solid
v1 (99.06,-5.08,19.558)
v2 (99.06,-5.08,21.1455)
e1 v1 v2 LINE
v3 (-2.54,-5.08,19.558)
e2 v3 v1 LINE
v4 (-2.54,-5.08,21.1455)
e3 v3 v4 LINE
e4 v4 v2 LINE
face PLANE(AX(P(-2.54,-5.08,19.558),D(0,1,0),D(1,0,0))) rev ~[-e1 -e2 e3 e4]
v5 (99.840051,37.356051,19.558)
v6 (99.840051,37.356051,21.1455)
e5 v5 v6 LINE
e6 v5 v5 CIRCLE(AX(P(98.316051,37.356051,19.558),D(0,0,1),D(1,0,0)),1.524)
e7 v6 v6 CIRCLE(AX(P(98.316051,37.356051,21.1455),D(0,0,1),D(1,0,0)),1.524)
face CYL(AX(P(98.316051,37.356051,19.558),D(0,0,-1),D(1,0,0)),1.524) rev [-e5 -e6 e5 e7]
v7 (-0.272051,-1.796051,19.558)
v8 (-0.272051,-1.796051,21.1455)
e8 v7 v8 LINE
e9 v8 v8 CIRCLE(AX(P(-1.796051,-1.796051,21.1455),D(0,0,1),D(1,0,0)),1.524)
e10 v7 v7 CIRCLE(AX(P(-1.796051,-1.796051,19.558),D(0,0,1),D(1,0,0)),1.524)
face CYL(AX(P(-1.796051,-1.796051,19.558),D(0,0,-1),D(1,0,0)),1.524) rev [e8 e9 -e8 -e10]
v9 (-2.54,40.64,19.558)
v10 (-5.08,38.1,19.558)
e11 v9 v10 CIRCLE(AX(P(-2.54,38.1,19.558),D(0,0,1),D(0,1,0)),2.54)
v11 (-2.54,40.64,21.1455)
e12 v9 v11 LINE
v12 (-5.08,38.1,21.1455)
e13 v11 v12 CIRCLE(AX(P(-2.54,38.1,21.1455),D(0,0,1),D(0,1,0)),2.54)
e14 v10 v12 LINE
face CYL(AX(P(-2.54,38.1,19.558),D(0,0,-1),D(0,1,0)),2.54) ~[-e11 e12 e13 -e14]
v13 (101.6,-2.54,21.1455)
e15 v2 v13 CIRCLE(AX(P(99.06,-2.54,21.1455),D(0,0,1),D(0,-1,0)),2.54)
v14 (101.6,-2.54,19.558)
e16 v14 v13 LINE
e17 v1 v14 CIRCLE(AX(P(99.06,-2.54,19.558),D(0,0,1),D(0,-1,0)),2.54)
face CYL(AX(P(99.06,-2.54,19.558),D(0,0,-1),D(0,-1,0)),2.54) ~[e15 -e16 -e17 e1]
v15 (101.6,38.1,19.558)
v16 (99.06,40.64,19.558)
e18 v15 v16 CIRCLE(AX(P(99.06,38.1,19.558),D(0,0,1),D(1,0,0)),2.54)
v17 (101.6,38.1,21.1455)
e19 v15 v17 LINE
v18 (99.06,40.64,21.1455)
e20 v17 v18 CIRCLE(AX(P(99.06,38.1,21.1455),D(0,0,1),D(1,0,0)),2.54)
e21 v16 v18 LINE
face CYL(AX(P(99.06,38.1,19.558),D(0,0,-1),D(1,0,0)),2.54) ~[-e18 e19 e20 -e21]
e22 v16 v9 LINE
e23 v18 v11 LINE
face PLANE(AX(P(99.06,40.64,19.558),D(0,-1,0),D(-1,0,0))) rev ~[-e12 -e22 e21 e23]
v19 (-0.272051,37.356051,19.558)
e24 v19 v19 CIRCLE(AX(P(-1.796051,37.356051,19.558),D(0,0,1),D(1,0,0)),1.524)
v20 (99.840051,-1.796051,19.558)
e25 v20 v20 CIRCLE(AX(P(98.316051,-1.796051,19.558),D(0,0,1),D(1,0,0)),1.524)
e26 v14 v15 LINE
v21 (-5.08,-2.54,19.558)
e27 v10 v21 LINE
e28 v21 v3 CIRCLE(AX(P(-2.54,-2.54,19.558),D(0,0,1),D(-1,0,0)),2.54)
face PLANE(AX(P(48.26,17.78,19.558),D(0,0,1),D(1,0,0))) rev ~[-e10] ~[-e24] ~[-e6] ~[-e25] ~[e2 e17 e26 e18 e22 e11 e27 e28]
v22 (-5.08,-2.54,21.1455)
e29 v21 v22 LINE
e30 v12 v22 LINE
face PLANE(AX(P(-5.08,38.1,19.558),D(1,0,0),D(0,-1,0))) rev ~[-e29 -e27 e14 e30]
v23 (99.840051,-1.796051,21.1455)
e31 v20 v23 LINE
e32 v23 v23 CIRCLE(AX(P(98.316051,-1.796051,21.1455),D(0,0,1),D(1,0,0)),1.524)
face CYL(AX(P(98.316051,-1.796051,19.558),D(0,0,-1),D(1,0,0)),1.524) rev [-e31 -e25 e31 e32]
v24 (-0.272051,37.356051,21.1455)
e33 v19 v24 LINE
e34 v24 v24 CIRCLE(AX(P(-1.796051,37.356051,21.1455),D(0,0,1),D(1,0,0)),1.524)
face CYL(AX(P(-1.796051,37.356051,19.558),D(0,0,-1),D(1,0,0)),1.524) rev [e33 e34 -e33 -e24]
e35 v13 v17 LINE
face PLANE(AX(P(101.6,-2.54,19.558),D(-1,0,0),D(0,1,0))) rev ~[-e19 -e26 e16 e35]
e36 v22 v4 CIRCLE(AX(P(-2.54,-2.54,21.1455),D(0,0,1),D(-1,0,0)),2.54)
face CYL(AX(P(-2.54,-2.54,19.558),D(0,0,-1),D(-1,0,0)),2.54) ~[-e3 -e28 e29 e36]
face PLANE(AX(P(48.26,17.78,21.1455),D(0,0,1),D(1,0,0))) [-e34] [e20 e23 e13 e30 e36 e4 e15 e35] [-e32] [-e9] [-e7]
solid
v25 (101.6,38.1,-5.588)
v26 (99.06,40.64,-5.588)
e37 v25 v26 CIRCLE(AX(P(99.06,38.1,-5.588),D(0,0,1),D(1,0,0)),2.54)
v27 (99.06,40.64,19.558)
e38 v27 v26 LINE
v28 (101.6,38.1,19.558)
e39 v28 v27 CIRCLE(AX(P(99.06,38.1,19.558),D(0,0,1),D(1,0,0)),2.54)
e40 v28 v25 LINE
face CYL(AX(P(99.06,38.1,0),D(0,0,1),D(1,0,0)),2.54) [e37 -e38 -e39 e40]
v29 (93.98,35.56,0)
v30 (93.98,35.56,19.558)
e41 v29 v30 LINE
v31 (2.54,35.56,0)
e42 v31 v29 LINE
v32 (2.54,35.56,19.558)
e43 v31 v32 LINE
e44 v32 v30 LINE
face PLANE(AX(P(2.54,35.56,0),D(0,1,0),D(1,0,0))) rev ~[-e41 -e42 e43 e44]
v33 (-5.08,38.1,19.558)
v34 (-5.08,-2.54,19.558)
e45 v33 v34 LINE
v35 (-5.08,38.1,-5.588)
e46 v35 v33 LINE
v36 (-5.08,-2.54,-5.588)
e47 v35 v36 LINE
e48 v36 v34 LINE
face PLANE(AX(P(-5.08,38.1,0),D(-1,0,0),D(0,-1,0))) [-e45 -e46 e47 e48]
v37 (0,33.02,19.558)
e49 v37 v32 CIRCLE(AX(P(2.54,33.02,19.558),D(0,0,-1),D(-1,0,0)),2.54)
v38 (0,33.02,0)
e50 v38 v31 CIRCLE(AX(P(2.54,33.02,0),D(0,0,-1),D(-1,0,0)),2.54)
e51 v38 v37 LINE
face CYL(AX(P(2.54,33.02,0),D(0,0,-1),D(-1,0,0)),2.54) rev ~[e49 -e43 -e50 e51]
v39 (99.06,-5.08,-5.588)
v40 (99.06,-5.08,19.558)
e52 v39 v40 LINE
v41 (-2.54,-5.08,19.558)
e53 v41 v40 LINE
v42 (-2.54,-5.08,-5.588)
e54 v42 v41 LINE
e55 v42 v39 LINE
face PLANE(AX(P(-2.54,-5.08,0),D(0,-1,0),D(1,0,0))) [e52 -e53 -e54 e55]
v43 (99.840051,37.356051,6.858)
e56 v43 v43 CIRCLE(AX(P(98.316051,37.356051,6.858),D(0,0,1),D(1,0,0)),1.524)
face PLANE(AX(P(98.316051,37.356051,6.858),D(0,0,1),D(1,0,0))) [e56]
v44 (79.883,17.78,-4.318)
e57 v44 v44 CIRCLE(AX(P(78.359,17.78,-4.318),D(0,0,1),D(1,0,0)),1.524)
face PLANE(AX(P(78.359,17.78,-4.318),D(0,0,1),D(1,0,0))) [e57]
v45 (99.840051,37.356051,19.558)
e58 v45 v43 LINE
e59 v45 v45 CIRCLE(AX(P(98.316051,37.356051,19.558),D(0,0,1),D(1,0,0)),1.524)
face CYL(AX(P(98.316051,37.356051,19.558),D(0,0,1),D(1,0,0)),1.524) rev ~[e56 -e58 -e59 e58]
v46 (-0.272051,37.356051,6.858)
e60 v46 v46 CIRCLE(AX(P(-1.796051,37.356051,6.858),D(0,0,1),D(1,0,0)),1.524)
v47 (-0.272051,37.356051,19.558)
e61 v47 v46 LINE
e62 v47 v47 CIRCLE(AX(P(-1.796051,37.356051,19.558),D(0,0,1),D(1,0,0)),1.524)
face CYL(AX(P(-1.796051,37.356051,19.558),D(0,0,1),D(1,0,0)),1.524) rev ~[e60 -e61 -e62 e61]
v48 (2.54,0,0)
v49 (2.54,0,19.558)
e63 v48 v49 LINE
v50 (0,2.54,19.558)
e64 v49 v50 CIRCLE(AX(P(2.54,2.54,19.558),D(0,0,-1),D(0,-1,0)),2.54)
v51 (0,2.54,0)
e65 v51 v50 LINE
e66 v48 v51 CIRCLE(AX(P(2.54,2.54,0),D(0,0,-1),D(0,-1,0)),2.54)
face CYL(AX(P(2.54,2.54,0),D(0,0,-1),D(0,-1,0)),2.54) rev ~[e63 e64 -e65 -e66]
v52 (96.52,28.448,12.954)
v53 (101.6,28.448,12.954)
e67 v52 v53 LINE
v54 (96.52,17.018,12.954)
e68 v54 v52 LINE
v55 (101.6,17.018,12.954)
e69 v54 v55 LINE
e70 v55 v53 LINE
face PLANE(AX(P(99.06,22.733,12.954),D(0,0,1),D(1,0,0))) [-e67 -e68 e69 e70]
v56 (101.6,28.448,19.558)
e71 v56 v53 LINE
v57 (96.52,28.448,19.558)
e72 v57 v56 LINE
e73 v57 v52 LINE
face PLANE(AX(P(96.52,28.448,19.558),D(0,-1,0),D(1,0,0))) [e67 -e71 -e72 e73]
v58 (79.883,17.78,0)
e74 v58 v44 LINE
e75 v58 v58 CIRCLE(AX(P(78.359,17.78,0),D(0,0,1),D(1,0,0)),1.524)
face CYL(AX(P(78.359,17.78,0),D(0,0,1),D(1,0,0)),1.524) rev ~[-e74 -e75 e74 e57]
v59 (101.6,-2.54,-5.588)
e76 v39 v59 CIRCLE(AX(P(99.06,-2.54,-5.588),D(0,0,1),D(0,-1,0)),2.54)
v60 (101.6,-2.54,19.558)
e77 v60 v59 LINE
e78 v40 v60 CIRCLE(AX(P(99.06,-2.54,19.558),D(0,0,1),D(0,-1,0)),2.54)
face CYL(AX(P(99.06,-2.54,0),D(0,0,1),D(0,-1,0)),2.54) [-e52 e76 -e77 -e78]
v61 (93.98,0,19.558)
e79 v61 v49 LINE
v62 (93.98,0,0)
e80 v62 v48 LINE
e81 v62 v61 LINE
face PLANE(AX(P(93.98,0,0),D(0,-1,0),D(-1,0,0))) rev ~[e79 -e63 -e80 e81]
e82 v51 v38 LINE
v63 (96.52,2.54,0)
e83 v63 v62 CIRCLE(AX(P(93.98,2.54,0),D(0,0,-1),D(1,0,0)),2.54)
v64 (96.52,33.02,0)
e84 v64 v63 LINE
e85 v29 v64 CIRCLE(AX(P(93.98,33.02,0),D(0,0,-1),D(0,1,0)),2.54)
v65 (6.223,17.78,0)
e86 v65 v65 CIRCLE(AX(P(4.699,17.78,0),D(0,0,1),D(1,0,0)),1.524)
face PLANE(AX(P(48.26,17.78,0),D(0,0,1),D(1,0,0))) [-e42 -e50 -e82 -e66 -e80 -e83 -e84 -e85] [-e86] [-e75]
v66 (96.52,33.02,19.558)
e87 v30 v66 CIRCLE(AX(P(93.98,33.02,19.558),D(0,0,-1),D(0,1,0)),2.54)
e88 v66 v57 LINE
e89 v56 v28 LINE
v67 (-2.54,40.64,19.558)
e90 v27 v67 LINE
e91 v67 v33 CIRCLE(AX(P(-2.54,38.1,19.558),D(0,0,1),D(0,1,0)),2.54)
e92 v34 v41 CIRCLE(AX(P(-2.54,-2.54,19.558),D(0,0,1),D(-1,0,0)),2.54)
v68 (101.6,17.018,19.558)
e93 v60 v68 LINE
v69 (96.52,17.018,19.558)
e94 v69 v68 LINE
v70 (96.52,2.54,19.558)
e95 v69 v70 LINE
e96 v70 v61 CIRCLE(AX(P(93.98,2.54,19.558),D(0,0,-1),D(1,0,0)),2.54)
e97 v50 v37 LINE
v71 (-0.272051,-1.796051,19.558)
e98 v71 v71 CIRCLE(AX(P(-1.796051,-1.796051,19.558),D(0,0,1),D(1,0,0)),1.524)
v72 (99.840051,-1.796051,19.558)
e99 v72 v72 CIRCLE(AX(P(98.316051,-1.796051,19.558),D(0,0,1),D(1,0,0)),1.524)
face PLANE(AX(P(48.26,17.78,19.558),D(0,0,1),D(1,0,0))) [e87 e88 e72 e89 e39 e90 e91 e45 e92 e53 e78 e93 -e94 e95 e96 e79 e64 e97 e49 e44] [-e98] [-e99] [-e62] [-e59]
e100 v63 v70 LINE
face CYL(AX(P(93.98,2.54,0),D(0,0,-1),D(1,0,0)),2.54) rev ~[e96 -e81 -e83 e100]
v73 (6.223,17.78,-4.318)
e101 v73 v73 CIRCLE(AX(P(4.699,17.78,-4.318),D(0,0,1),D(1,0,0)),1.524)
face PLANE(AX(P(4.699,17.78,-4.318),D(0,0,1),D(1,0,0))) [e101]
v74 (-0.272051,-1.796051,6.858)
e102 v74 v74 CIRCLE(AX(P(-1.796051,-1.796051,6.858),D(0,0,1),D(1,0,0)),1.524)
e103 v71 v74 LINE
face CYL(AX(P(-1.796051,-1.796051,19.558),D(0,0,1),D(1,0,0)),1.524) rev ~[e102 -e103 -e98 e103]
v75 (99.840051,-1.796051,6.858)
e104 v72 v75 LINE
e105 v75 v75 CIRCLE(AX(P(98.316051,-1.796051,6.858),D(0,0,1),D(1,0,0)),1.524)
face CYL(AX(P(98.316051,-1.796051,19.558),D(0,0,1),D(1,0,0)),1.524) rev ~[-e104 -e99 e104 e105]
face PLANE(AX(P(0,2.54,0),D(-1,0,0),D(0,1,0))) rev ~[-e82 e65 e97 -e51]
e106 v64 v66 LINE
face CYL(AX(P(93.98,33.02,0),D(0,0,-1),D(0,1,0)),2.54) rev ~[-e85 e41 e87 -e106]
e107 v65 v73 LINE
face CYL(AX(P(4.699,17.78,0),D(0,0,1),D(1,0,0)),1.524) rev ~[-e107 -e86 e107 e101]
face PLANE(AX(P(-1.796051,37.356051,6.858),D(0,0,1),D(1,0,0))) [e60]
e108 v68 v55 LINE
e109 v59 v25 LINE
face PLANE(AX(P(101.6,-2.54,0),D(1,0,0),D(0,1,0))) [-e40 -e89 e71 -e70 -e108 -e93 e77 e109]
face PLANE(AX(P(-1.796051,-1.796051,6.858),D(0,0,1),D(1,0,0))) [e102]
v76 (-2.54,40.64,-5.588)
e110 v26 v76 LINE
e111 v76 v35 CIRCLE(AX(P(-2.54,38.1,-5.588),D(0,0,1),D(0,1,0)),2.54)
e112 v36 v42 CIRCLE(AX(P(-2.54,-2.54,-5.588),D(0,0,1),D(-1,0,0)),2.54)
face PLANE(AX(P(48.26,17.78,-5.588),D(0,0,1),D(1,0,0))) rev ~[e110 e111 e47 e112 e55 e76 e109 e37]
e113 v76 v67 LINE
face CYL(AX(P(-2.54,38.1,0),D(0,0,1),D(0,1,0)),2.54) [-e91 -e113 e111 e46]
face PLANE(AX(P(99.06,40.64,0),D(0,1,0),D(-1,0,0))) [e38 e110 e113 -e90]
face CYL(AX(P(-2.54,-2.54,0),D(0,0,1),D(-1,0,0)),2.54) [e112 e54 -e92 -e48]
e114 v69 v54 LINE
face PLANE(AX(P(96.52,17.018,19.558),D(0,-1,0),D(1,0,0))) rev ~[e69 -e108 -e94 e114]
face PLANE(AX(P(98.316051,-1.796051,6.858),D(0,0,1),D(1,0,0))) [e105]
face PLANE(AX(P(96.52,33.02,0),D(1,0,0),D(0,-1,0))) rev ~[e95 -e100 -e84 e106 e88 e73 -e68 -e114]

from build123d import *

# Parameters (mm, degrees)
F1_DEPTH = 19.558
F0_R     = 1.524
F2_DEPTH = 5.588
F3_R     = 1.524
F4_DEPTH = 12.7
F5_W     = 5.08
F5_H     = 11.43
F6_DEPTH = 6.604
F7_DEPTH = 4.318
F8_R     = 1.524
F9_DEPTH = 1.5875


# Not quite as in the source:
# - a length typed as a fraction of an inch, garbled in the dataset ("3 / 203.2 mm" for 3/8 in), is restored


with BuildPart() as f1:
    # F0 (on Top) → F1 (new body)
    with BuildSketch(Plane.XY):
        with BuildLine():
            Line((99.06, 40.64), (-2.54, 40.64))
            ThreePointArc((-2.54, 40.64), (-4.3360512242, 39.8960512242), (-5.08, 38.1))
            Line((-5.08, 38.1), (-5.08, -2.54))
            ThreePointArc((-5.08, -2.54), (-4.3360512242, -4.3360512242), (-2.54, -5.08))
            Line((-2.54, -5.08), (99.06, -5.08))
            ThreePointArc((99.06, -5.08), (100.8560512242, -4.3360512242), (101.6, -2.54))
            Line((101.6, -2.54), (101.6, 38.1))
            ThreePointArc((101.6, 38.1), (100.8560512242, 39.8960512242), (99.06, 40.64))
        make_face()
        with BuildLine():
            Line((93.98, 0), (2.54, 0))
            ThreePointArc((2.54, 0), (0.7439487758, 0.7439487758), (0, 2.54))
            Line((0, 2.54), (0, 33.02))
            ThreePointArc((0, 33.02), (0.7439487758, 34.8160512242), (2.54, 35.56))
            Line((2.54, 35.56), (93.98, 35.56))
            ThreePointArc((93.98, 35.56), (95.7760512242, 34.8160512242), (96.52, 33.02))
            Line((96.52, 33.02), (96.52, 2.54))
            ThreePointArc((96.52, 2.54), (95.7760512242, 0.7439487758), (93.98, 0))
        make_face(mode=Mode.SUBTRACT)
    extrude(amount=F1_DEPTH)

    # F0 (on Top) → F2 (join)
    with BuildSketch(Plane.XY):
        with BuildLine():
            Line((99.06, 40.64), (-2.54, 40.64))
            ThreePointArc((-2.54, 40.64), (-4.3360512242, 39.8960512242), (-5.08, 38.1))
            Line((-5.08, 38.1), (-5.08, -2.54))
            ThreePointArc((-5.08, -2.54), (-4.3360512242, -4.3360512242), (-2.54, -5.08))
            Line((-2.54, -5.08), (99.06, -5.08))
            ThreePointArc((99.06, -5.08), (100.8560512242, -4.3360512242), (101.6, -2.54))
            Line((101.6, -2.54), (101.6, 38.1))
            ThreePointArc((101.6, 38.1), (100.8560512242, 39.8960512242), (99.06, 40.64))
        make_face()
        with BuildLine():
            Line((93.98, 0), (2.54, 0))
            ThreePointArc((2.54, 0), (0.7439487758, 0.7439487758), (0, 2.54))
            Line((0, 2.54), (0, 33.02))
            ThreePointArc((0, 33.02), (0.7439487758, 34.8160512242), (2.54, 35.56))
            Line((2.54, 35.56), (93.98, 35.56))
            ThreePointArc((93.98, 35.56), (95.7760512242, 34.8160512242), (96.52, 33.02))
            Line((96.52, 33.02), (96.52, 2.54))
            ThreePointArc((96.52, 2.54), (95.7760512242, 0.7439487758), (93.98, 0))
        make_face(mode=Mode.SUBTRACT)
        with BuildLine():
            ThreePointArc((0, 2.54), (0.7439487758, 0.7439487758), (2.54, 0))
            Line((2.54, 0), (93.98, 0))
            ThreePointArc((93.98, 0), (95.7760512242, 0.7439487758), (96.52, 2.54))
            Line((96.52, 2.54), (96.52, 33.02))
            ThreePointArc((96.52, 33.02), (95.7760512242, 34.8160512242), (93.98, 35.56))
            Line((93.98, 35.56), (2.54, 35.56))
            ThreePointArc((2.54, 35.56), (0.7439487758, 34.8160512242), (0, 33.02))
            Line((0, 33.02), (0, 2.54))
        make_face()
        with Locations((4.699, 17.78)):
            Circle(F0_R, mode=Mode.SUBTRACT)
        with Locations((78.359, 17.78)):
            Circle(F0_R, mode=Mode.SUBTRACT)
        with Locations((78.359, 17.78)):
            Circle(F0_R)
        with Locations((4.699, 17.78)):
            Circle(F0_R)
    extrude(amount=-F2_DEPTH)

    # F3 (on face) → F4 (cut)
    with BuildSketch(Plane.XY.offset(19.558)):
        with Locations((-1.7960512242, -1.7960512242)):
            Circle(F3_R)
        with Locations((-1.7960512242, 37.3560512242)):
            Circle(F3_R)
        with Locations((98.3160512242, 37.3560512242)):
            Circle(F3_R)
        with Locations((98.3160512242, -1.7960512242)):
            Circle(F3_R)
    extrude(amount=-F4_DEPTH, mode=Mode.SUBTRACT)

    # F5 (on face) → F6 (cut)
    with BuildSketch(Plane.XY.offset(19.558)):
        with Locations((99.06, 22.733)):
            Rectangle(F5_W, F5_H)
    extrude(amount=-F6_DEPTH, mode=Mode.SUBTRACT)

    # F0 (on Top) → F7 (cut)
    with BuildSketch(Plane.XY):
        with Locations((4.699, 17.78)):
            Circle(F0_R)
        with Locations((78.359, 17.78)):
            Circle(F0_R)
    extrude(amount=-F7_DEPTH, mode=Mode.SUBTRACT)


with BuildPart() as f9:
    # F8 (on face) → F9 (new body)
    with BuildSketch(Plane.XY.offset(19.558)):
        with BuildLine():
            Line((99.06, 40.64), (-2.54, 40.64))
            ThreePointArc((-2.54, 40.64), (-4.3360512242, 39.8960512242), (-5.08, 38.1))
            Line((-5.08, 38.1), (-5.08, -2.54))
            ThreePointArc((-5.08, -2.54), (-4.3360512242, -4.3360512242), (-2.54, -5.08))
            Line((-2.54, -5.08), (99.06, -5.08))
            ThreePointArc((99.06, -5.08), (100.8560512242, -4.3360512242), (101.6, -2.54))
            Line((101.6, -2.54), (101.6, 38.1))
            ThreePointArc((101.6, 38.1), (100.8560512242, 39.8960512242), (99.06, 40.64))
        make_face()
        with Locations((-1.7960512242, -1.7960512242)):
            Circle(F8_R, mode=Mode.SUBTRACT)
        with Locations((98.3160512242, -1.7960512242)):
            Circle(F8_R, mode=Mode.SUBTRACT)
        with Locations((-1.7960512242, 37.3560512242)):
            Circle(F8_R, mode=Mode.SUBTRACT)
        with Locations((98.3160512242, 37.3560512242)):
            Circle(F8_R, mode=Mode.SUBTRACT)
    extrude(amount=F9_DEPTH)


solid = Compound([f1.part, f9.part])
